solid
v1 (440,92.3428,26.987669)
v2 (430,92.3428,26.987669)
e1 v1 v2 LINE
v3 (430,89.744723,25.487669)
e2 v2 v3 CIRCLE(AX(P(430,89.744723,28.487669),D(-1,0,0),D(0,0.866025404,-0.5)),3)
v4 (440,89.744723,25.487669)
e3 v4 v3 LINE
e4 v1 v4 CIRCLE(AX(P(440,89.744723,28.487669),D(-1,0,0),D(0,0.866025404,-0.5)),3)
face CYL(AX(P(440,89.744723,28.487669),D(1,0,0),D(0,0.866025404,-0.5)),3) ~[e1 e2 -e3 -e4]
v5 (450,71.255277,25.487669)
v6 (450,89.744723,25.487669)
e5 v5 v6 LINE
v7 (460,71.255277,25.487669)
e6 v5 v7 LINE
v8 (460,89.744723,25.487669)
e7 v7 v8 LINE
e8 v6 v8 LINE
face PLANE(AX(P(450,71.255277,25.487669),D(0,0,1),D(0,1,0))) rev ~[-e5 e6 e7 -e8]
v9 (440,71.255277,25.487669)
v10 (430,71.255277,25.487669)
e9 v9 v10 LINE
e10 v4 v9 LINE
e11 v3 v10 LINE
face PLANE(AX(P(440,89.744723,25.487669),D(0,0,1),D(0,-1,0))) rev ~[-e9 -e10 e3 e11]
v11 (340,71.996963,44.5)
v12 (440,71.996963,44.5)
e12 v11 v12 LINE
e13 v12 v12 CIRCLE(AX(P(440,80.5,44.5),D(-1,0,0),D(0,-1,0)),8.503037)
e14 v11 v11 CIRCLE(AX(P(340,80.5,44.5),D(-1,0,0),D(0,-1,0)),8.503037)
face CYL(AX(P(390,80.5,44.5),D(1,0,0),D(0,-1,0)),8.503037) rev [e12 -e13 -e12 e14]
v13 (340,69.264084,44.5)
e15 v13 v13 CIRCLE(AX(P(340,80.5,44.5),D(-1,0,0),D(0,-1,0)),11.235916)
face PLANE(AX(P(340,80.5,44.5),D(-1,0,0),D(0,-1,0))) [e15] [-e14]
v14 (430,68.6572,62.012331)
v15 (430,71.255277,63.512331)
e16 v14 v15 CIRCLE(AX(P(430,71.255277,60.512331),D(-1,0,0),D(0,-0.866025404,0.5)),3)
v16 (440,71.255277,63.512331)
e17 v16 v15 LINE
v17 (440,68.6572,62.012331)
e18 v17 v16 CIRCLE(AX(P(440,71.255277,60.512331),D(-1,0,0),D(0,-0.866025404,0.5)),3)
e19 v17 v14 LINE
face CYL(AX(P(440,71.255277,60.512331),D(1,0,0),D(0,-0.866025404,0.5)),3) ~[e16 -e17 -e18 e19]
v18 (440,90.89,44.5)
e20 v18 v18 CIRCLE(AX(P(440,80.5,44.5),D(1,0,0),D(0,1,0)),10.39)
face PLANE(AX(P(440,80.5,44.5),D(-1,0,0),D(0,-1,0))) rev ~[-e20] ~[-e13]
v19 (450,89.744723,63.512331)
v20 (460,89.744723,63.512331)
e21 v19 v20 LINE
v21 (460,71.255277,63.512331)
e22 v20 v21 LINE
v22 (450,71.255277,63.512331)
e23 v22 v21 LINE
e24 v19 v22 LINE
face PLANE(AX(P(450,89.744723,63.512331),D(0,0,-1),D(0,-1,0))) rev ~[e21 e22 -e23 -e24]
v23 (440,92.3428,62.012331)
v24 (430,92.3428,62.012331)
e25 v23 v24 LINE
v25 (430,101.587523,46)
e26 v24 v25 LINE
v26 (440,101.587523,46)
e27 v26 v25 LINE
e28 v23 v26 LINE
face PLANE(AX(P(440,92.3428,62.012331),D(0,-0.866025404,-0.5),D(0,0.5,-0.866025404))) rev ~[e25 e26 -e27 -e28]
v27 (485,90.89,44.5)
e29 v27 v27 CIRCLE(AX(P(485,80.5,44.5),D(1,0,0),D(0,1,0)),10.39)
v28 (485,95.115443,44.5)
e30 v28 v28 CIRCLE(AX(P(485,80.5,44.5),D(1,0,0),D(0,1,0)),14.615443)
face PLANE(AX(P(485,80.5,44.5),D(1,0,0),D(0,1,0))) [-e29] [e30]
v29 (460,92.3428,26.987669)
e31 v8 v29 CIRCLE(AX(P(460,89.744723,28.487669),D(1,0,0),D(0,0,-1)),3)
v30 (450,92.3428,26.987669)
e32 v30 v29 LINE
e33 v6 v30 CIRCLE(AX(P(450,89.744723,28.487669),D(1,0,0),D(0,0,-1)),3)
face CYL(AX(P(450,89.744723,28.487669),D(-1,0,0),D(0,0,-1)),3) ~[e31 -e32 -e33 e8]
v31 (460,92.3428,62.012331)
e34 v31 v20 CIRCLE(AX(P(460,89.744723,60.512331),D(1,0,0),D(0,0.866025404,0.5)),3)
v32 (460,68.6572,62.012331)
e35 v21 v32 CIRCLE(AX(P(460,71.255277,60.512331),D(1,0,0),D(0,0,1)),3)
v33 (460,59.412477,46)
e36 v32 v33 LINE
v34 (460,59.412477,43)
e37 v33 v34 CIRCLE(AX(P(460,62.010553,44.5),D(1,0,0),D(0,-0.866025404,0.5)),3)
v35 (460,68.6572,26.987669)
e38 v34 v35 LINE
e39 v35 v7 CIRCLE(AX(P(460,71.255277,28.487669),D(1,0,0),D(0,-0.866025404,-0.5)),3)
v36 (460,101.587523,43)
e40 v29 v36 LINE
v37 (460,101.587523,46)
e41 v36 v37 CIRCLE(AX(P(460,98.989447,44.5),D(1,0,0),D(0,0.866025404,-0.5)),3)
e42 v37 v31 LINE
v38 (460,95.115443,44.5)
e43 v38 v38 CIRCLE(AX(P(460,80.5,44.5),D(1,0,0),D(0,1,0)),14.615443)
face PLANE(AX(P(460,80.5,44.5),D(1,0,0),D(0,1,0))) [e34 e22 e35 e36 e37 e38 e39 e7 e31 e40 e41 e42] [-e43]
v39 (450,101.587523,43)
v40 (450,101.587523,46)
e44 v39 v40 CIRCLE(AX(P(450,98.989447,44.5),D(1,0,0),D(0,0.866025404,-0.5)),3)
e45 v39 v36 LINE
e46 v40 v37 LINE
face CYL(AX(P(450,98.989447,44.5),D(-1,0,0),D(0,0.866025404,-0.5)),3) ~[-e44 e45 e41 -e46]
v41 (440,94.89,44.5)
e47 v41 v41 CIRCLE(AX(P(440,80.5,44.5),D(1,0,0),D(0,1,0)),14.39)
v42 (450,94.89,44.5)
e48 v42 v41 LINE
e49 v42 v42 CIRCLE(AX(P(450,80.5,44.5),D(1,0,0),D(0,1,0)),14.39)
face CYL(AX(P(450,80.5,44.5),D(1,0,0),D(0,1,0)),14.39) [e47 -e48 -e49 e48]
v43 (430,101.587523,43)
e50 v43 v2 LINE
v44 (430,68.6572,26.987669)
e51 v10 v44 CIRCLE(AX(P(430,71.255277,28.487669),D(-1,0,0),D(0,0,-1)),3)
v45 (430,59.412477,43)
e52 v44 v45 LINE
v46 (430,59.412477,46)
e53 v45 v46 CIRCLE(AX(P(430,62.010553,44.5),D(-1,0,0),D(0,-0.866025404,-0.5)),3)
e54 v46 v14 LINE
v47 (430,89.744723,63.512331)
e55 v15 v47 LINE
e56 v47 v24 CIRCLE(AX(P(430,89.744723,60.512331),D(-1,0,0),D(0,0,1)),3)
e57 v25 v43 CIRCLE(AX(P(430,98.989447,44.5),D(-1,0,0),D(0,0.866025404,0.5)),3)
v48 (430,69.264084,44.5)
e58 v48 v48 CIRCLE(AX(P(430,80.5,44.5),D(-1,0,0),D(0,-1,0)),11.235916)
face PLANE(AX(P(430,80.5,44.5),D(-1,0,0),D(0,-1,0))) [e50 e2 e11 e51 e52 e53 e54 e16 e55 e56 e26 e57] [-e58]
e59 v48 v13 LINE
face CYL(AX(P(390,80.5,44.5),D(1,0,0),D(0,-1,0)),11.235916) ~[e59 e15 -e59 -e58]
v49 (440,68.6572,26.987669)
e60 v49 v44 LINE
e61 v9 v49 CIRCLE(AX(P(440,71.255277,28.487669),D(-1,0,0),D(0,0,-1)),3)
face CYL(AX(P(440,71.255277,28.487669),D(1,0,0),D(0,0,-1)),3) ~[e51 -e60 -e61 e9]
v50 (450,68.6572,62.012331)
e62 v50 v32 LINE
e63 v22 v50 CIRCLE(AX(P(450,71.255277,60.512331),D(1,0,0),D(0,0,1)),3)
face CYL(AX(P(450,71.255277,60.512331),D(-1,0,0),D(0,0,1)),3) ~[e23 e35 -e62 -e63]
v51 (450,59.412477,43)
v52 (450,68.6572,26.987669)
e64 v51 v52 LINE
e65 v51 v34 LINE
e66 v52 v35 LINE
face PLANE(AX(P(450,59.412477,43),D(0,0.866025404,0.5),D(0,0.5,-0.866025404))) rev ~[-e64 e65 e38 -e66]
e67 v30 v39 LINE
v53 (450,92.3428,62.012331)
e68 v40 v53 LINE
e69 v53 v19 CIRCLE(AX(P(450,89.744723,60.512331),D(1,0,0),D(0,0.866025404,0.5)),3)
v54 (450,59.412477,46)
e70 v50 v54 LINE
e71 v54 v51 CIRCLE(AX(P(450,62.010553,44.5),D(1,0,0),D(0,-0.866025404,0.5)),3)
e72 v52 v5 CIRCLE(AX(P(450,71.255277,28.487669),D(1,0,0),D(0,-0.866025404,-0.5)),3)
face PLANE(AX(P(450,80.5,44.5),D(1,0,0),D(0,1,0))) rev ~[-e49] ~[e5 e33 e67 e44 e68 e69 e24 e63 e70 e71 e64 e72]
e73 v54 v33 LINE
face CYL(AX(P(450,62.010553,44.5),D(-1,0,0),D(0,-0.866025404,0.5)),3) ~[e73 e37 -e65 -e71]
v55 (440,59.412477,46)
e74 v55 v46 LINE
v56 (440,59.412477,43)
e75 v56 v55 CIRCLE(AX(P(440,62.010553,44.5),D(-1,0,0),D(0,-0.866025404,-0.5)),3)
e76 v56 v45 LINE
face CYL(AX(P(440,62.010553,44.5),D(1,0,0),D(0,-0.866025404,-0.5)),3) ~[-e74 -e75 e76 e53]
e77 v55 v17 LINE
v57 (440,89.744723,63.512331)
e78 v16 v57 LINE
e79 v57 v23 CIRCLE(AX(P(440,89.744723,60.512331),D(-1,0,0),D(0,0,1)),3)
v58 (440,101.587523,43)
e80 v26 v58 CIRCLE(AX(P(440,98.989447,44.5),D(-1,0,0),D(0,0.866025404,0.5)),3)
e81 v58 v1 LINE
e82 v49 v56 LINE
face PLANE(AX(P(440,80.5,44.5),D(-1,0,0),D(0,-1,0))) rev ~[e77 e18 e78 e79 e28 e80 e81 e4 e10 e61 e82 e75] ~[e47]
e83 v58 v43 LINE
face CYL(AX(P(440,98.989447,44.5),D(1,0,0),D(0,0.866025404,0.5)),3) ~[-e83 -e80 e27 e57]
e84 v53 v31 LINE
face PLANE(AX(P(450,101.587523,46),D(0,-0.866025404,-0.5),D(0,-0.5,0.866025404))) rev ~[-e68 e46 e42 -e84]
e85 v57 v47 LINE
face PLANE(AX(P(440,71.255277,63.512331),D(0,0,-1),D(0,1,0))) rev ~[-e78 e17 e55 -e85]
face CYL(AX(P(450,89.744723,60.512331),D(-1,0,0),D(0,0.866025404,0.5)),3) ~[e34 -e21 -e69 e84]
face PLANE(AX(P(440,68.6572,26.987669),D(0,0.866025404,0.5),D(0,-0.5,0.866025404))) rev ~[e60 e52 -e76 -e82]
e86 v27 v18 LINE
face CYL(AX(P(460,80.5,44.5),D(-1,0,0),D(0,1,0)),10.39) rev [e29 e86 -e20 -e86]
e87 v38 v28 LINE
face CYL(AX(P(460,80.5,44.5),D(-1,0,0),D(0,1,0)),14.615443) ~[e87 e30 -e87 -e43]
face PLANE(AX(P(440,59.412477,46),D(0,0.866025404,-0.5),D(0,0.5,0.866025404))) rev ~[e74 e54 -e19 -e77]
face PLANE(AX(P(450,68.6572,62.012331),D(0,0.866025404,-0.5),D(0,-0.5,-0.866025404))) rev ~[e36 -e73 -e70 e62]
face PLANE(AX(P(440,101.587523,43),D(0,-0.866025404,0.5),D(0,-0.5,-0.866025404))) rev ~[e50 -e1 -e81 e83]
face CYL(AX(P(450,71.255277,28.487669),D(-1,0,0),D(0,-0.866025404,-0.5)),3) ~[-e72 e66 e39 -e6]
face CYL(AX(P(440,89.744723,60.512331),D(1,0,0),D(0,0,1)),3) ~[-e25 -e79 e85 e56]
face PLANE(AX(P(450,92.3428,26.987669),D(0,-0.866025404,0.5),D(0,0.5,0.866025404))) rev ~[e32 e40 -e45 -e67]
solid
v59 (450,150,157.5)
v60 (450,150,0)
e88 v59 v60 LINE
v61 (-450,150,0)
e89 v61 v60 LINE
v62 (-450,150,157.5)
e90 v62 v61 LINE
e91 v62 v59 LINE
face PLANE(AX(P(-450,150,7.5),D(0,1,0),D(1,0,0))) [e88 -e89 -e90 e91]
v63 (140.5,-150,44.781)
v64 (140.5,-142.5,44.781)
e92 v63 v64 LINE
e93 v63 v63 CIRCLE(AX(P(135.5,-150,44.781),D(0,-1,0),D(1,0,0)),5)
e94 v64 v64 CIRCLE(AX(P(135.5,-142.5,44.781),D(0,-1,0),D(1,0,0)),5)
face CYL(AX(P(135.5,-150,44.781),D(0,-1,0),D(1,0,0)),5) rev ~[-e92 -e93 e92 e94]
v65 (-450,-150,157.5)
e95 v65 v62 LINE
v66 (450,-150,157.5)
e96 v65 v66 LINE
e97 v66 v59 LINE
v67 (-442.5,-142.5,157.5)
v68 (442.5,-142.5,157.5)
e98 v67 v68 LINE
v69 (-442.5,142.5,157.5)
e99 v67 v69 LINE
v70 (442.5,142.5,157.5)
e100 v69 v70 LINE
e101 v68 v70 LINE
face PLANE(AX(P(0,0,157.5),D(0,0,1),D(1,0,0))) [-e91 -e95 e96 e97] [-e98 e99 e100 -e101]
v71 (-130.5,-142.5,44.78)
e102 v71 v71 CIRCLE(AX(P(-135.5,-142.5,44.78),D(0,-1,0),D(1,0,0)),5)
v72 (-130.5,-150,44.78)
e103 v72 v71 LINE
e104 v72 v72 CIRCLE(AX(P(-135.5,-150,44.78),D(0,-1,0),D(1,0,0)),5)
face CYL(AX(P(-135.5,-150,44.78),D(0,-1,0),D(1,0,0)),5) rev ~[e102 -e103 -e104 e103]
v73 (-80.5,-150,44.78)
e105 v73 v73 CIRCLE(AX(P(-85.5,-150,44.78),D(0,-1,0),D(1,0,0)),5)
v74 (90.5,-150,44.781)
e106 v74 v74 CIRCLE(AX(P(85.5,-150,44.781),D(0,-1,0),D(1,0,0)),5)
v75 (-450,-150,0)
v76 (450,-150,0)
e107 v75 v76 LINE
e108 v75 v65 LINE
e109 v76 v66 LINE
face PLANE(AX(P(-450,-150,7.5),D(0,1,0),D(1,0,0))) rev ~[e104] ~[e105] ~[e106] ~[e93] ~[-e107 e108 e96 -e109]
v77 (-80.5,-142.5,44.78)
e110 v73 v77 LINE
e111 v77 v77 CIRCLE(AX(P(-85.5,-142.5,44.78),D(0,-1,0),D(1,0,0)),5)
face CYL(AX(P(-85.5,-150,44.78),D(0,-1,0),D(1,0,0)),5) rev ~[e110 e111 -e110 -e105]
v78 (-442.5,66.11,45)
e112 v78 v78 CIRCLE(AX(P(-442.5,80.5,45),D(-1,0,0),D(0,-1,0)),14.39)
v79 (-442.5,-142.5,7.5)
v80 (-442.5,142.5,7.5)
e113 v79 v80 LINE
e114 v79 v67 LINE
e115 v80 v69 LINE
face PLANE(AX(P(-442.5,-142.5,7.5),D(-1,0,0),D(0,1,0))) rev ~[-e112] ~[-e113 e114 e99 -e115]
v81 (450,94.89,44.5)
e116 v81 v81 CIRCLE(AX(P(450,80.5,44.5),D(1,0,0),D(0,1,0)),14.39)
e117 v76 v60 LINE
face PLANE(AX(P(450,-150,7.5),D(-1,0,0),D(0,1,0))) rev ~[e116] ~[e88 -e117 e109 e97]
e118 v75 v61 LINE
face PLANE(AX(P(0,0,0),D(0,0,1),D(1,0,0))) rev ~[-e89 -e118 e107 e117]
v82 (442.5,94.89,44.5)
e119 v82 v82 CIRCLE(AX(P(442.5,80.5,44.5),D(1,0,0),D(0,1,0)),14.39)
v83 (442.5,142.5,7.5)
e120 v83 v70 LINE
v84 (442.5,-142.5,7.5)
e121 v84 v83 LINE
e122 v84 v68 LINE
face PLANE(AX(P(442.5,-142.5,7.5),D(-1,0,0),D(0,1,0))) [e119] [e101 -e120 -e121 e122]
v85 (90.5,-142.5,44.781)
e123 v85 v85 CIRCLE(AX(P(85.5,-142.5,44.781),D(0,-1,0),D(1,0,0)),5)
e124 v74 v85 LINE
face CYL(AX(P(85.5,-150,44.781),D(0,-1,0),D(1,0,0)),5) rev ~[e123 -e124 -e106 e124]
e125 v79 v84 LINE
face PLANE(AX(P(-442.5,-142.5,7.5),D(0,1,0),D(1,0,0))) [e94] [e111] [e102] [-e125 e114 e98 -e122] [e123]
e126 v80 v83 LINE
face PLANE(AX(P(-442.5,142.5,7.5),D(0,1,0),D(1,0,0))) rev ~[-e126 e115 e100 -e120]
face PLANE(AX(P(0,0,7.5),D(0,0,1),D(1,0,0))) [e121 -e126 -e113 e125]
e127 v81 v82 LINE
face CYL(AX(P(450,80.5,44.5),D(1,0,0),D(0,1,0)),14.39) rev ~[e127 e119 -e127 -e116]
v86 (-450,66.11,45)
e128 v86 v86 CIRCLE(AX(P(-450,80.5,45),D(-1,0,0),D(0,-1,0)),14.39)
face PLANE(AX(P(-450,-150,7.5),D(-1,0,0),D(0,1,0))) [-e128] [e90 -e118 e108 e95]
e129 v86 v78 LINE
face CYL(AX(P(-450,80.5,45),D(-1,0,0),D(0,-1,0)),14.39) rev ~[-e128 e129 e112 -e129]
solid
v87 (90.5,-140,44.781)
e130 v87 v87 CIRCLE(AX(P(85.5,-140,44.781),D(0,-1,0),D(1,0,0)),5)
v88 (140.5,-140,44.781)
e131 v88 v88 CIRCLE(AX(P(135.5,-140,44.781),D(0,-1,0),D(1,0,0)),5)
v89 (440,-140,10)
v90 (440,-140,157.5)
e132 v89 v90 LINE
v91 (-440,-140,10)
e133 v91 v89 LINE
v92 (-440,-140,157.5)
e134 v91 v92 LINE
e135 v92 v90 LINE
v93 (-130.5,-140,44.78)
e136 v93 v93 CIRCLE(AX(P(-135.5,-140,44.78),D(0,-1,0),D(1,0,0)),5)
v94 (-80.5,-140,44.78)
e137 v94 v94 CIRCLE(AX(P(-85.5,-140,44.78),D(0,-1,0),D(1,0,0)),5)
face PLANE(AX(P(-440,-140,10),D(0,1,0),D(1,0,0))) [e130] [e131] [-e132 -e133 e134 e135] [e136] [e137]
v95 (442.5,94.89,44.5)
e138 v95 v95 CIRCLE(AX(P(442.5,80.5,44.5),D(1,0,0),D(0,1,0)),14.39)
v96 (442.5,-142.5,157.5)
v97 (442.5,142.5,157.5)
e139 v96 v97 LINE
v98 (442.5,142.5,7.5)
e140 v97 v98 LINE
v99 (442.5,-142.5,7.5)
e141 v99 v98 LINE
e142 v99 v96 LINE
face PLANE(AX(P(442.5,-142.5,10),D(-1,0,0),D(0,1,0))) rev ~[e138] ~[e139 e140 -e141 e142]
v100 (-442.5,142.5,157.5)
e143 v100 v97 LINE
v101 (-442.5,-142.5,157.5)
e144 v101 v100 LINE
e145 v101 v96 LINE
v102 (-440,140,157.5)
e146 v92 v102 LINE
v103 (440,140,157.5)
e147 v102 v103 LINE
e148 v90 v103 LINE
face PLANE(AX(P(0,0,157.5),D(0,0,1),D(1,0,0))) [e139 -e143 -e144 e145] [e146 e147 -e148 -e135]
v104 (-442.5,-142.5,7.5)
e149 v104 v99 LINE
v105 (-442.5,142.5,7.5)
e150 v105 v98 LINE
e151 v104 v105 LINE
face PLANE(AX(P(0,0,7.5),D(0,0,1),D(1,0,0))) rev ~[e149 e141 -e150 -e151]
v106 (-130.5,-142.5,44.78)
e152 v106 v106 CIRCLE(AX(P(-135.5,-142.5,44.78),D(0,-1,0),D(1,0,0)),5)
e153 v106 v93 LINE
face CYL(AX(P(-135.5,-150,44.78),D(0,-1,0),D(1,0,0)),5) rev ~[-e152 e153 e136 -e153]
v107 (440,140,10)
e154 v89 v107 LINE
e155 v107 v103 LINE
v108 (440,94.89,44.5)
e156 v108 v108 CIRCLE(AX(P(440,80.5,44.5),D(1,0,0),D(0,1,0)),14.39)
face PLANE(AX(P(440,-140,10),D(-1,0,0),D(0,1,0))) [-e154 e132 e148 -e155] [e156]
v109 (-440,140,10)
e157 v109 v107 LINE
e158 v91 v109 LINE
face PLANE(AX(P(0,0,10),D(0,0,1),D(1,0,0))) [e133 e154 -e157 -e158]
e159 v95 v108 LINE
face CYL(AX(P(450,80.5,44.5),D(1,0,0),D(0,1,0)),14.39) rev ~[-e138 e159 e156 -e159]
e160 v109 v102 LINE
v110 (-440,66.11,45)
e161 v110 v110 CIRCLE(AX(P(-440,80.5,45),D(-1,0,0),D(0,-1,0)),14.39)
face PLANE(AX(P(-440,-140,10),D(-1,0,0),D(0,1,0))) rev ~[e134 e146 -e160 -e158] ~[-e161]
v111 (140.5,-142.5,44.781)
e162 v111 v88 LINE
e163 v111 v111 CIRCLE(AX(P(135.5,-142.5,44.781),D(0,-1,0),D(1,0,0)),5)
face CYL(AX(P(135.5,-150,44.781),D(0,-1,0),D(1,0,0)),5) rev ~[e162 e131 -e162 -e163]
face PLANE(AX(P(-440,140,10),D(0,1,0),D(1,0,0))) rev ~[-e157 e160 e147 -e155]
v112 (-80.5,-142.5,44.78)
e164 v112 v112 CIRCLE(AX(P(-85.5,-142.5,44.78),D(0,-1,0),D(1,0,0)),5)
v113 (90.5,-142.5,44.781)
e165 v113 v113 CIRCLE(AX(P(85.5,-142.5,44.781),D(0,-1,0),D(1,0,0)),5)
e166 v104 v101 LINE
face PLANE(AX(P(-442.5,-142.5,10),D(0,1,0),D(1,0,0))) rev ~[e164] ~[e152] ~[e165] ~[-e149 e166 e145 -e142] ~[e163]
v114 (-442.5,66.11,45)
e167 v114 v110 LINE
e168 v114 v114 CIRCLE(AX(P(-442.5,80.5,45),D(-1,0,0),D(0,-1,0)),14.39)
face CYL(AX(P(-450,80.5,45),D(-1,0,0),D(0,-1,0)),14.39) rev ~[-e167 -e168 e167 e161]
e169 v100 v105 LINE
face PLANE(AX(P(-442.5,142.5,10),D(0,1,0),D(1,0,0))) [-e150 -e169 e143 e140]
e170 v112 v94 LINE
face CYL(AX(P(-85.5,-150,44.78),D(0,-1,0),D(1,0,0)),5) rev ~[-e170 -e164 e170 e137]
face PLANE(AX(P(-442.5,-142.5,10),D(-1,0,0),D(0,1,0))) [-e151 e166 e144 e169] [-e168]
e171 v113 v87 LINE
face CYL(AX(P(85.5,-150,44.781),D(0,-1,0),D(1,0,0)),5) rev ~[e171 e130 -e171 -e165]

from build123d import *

# Parameters (mm, degrees)
F0_W      = 900
F0_H      = 300
F1_DEPTH  = 7.5
F2_W      = 900
F2_H      = 300
F2_W_2    = 885
F2_H_2    = 285
F3_DEPTH  = 150
F4_DEPTH  = 2.5
F5_W      = 885
F5_H      = 285
F5_W_2    = 880
F5_H_2    = 280
F6_DEPTH  = 147.5
F7_R      = 5
F8_DEPTH  = 25
F9_R      = 14.39
F10_DEPTH = 500
F11_R     = 14.39
F12_DEPTH = 25
F13_R     = 14.39
F13_R_2   = 10.39
F14_DEPTH = 10
F15_R     = 10.39
F16_DEPTH = 10
F17_R     = 14.6154428136
F17_R_2   = 10.39
F18_DEPTH = 25
F19_R     = 11.2359155228
F19_R_2   = 8.5030368104
F20_DEPTH = 50
F21_R     = 11.2359155228
F22_DEPTH = 10
F23_DEPTH = 50


with BuildPart() as f1:
    # F0 (on Top) → F1 (new body)
    with BuildSketch(Plane.XY):
        Rectangle(F0_W, F0_H)
    extrude(amount=F1_DEPTH)

    # F2 (on face) → F3 (join)
    with BuildSketch(Plane.XY.offset(7.5)):
        Rectangle(F2_W, F2_H)
        Rectangle(F2_W_2, F2_H_2, mode=Mode.SUBTRACT)
    extrude(amount=F3_DEPTH)


with BuildPart() as f4:
    # F4 (new): a face of the model
    f4_faces = [f1.part.faces().sort_by_distance(p)[0] for p in [
        (0, 0, 7.5),
    ]]
    extrude(f4_faces, amount=F4_DEPTH)

    # F5 (on face) → F6 (join)
    with BuildSketch(Plane.XY.offset(10)):
        Rectangle(F5_W, F5_H)
        Rectangle(F5_W_2, F5_H_2, mode=Mode.SUBTRACT)
    extrude(amount=F6_DEPTH)


with BuildPart() as f8_tool:
    # F7 (on face) → F8 (new body)
    with BuildSketch(Plane.XZ.offset(150)):
        with Locations((85.5, 44.781)):
            Circle(F7_R)
        with Locations((135.5, 44.781)):
            Circle(F7_R)
        with Locations((-85.5, 44.78)):
            Circle(F7_R)
        with Locations((-135.5, 44.78)):
            Circle(F7_R)
    extrude(amount=-F8_DEPTH)


with BuildPart() as f1_1:
    add(f1.part)

    # F8: cut by f8_tool
    add(f8_tool.part, mode=Mode.SUBTRACT)


with BuildPart() as f4_1:
    add(f4.part)

    # F8: cut by f8_tool
    add(f8_tool.part, mode=Mode.SUBTRACT)


with BuildPart() as f10_tool:
    # F9 (on face) → F10 (new body)
    with BuildSketch(Plane(origin=(-450, 0, 0), x_dir=(0, -1, 0), z_dir=(-1, 0, 0))):
        with Locations((-80.5, 45)):
            Circle(F9_R)
    extrude(amount=-F10_DEPTH)


with BuildPart() as f1_2:
    add(f1_1.part)

    # F10: cut by f10_tool
    add(f10_tool.part, mode=Mode.SUBTRACT)


with BuildPart() as f4_2:
    add(f4_1.part)

    # F10: cut by f10_tool
    add(f10_tool.part, mode=Mode.SUBTRACT)


with BuildPart() as f12_tool:
    # F11 (on face) → F12 (new body)
    with BuildSketch(Plane.YZ.offset(450)):
        with Locations((80.5, 44.5)):
            Circle(F11_R)
    extrude(amount=-F12_DEPTH)


with BuildPart() as f1_3:
    add(f1_2.part)

    # F12: cut by f12_tool
    add(f12_tool.part, mode=Mode.SUBTRACT)


with BuildPart() as f4_3:
    add(f4_2.part)

    # F12: cut by f12_tool
    add(f12_tool.part, mode=Mode.SUBTRACT)


with BuildPart() as f14:
    # F13 (on face) → F14 (new body)
    with BuildSketch(Plane.YZ.offset(450)):
        with Locations((80.5, 44.5)):
            Circle(F13_R)
        with Locations((80.5, 44.5)):
            Circle(F13_R_2, mode=Mode.SUBTRACT)
    extrude(amount=-F14_DEPTH)

    # F15 (on face) → F16 (join)
    with BuildSketch(Plane.YZ.offset(450)):
        with BuildLine():
            Line((89.7447234463, 63.5123307109), (71.2552765537, 63.5123307109))
            ThreePointArc((71.2552765537, 63.5123307109), (69.7552765537, 63.1104069222), (68.6572003424, 62.0123307109))
            Line((68.6572003424, 62.0123307109), (59.4124768961, 46))
            ThreePointArc((59.4124768961, 46), (59.0105531074, 44.5), (59.4124768961, 43))
            Line((59.4124768961, 43), (68.6572003424, 26.9876692891))
            ThreePointArc((68.6572003424, 26.9876692891), (69.7552765537, 25.8895930778), (71.2552765537, 25.4876692891))
            Line((71.2552765537, 25.4876692891), (89.7447234463, 25.4876692891))
            ThreePointArc((89.7447234463, 25.4876692891), (91.2447234463, 25.8895930778), (92.3427996576, 26.9876692891))
            Line((92.3427996576, 26.9876692891), (101.5875231039, 43))
            ThreePointArc((101.5875231039, 43), (101.9894468926, 44.5), (101.5875231039, 46))
            Line((101.5875231039, 46), (92.3427996576, 62.0123307109))
            ThreePointArc((92.3427996576, 62.0123307109), (91.2447234463, 63.1104069222), (89.7447234463, 63.5123307109))
        make_face()
        with Locations((80.5, 44.5)):
            Circle(F15_R, mode=Mode.SUBTRACT)
    extrude(amount=F16_DEPTH)

    # F17 (on face) → F18 (join)
    with BuildSketch(Plane.YZ.offset(460)):
        with Locations((80.5, 44.5)):
            Circle(F17_R)
        with Locations((80.5, 44.5)):
            Circle(F17_R_2, mode=Mode.SUBTRACT)
    extrude(amount=F18_DEPTH)

    # F19 (on face) → F20 (join)
    with BuildSketch(Plane(origin=(440, 0, 0), x_dir=(0, -1, 0), z_dir=(-1, 0, 0))):
        with Locations((-80.5, 44.5)):
            Circle(F19_R)
        with Locations((-80.5, 44.5)):
            Circle(F19_R_2, mode=Mode.SUBTRACT)
    extrude(amount=F20_DEPTH)

    # F21 (on face) → F22 (join)
    with BuildSketch(Plane(origin=(440, 0, 0), x_dir=(0, -1, 0), z_dir=(-1, 0, 0))):
        with BuildLine():
            Line((-71.2552765537, 63.5123307109), (-89.7447234463, 63.5123307109))
            ThreePointArc((-89.7447234463, 63.5123307109), (-91.2447234463, 63.1104069222), (-92.3427996576, 62.0123307109))
            Line((-92.3427996576, 62.0123307109), (-101.5875231039, 46))
            ThreePointArc((-101.5875231039, 46), (-101.9894468926, 44.5), (-101.5875231039, 43))
            Line((-101.5875231039, 43), (-92.3427996576, 26.9876692891))
            ThreePointArc((-92.3427996576, 26.9876692891), (-91.2447234463, 25.8895930778), (-89.7447234463, 25.4876692891))
            Line((-89.7447234463, 25.4876692891), (-71.2552765537, 25.4876692891))
            ThreePointArc((-71.2552765537, 25.4876692891), (-69.7552765537, 25.8895930778), (-68.6572003424, 26.9876692891))
            Line((-68.6572003424, 26.9876692891), (-59.4124768961, 43))
            ThreePointArc((-59.4124768961, 43), (-59.0105531074, 44.5), (-59.4124768961, 46))
            Line((-59.4124768961, 46), (-68.6572003424, 62.0123307109))
            ThreePointArc((-68.6572003424, 62.0123307109), (-69.7552765537, 63.1104069222), (-71.2552765537, 63.5123307109))
        make_face()
        with Locations((-80.5, 44.5)):
            Circle(F21_R, mode=Mode.SUBTRACT)
    extrude(amount=F22_DEPTH)

    # F23 (add): a face of the model
    f23_faces = [f14.faces().sort_by_distance(p)[0] for p in [
        (390, 91.4181158404, 44.5),
    ]]
    extrude(f23_faces, amount=F23_DEPTH)


solid = Compound([f1_3.part, f4_3.part, f14.part])
